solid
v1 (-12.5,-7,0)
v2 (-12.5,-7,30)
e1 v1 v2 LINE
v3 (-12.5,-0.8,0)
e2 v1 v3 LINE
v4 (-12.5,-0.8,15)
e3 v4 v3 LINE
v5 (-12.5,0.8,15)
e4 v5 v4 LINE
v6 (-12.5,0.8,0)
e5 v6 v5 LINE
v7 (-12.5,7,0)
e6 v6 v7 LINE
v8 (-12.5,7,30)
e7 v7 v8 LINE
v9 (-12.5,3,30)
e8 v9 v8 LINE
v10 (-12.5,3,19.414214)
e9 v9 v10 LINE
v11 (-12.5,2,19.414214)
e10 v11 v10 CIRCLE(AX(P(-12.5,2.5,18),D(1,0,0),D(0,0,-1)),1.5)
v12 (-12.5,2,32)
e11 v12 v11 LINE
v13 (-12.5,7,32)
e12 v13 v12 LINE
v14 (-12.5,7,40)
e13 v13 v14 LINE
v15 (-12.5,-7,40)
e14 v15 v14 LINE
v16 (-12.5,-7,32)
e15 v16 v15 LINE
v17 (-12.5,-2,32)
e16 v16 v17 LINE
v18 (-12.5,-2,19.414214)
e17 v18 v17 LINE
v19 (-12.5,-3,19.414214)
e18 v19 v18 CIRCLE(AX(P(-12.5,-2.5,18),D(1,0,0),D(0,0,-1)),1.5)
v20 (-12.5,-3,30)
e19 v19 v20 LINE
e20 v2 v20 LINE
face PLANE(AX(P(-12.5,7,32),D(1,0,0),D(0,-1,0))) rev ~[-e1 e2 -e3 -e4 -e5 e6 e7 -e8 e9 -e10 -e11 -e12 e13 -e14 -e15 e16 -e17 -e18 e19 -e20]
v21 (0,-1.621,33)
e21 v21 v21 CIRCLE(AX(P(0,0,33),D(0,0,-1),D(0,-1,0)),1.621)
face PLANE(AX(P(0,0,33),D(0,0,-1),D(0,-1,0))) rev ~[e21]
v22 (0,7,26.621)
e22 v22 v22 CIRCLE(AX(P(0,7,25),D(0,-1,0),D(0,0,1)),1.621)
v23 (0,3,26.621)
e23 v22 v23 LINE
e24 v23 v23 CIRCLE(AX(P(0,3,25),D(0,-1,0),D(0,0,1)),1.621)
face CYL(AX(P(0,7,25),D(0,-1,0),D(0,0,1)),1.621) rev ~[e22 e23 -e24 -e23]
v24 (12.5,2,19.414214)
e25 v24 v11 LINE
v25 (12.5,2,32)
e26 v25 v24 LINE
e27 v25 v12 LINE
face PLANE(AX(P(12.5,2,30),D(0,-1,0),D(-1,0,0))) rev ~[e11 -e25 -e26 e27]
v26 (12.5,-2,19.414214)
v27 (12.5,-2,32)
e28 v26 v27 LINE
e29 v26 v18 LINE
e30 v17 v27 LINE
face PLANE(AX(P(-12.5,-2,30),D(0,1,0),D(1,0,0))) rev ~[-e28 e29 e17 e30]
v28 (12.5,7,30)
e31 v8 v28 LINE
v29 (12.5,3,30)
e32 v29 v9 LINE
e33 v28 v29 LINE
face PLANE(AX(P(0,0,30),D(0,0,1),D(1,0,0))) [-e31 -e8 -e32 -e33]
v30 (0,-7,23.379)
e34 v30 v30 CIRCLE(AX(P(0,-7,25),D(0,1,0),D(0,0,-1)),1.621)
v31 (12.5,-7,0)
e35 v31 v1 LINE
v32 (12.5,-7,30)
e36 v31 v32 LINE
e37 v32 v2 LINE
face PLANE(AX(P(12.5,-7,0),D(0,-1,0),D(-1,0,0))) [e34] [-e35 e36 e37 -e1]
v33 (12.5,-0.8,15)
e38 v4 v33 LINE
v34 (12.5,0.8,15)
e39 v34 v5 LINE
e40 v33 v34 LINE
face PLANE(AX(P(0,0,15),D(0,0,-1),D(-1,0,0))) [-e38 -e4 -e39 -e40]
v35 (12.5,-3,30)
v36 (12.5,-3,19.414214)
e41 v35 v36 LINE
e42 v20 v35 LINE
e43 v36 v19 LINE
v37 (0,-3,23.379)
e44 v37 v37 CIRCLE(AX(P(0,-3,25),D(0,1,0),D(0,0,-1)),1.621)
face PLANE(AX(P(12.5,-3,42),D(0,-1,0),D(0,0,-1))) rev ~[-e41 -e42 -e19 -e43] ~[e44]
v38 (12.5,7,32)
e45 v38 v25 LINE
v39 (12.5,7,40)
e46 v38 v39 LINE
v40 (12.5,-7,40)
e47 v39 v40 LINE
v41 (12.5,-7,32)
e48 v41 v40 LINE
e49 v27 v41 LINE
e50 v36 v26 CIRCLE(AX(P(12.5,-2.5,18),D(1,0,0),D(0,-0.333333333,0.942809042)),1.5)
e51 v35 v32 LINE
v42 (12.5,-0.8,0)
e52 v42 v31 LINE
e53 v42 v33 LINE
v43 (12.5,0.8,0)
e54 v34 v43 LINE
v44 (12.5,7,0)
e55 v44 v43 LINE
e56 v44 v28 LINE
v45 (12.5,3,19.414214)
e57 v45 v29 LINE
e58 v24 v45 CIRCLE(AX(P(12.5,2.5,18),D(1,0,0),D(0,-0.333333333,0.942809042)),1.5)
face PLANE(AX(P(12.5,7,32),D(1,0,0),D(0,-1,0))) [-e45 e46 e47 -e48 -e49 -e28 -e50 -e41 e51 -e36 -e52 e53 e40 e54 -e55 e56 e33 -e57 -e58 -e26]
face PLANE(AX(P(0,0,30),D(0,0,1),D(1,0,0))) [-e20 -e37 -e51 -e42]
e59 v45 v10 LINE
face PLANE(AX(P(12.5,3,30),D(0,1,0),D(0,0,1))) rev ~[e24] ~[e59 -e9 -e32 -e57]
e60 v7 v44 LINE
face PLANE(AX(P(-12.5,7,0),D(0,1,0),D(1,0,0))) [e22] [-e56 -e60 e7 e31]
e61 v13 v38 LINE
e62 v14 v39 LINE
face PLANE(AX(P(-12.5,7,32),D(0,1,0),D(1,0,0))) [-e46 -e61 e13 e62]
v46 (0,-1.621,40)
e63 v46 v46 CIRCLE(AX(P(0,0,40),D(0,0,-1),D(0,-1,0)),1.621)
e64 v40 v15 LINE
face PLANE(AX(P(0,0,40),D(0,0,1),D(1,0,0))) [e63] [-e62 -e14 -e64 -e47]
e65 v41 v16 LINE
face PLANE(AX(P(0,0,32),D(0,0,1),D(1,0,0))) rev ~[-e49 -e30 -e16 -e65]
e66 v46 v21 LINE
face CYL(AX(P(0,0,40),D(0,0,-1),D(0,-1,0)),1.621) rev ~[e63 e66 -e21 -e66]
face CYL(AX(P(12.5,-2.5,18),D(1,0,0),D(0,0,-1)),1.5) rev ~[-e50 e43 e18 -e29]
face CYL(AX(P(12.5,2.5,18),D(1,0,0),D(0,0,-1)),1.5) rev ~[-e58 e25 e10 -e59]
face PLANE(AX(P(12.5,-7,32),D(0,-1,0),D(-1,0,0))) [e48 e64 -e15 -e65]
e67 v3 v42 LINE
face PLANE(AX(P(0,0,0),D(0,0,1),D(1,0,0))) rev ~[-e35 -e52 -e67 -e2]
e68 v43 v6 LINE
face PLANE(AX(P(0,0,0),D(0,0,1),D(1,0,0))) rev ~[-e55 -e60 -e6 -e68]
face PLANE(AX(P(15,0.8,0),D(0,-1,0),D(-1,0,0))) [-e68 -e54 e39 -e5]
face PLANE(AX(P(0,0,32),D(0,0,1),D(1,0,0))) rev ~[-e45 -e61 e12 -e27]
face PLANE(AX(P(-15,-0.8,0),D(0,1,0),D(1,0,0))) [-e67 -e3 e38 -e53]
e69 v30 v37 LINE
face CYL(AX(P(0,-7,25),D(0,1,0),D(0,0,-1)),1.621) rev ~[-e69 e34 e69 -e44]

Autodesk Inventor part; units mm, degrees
ref_plane "YZ Plane" through (0, 0, 0) normal (1, 0, 0) x (0, 1, 0)
ref_plane "XZ Plane" through (0, 0, 0) normal (0, 1, 0) x (-1, 0, 0)
ref_plane "XY Plane" through (0, 0, 0) normal (0, 0, 1) x (1, 0, 0)
sketch "Sketch1" plane through (0, 0, 0) normal (0, 0, 1) x (1, 0, 0)
  line L0 (12.5, -7) -> (-12.5, -7)
  line L1 (-12.5, -7) -> (-12.5, 7)
  line L2 (-12.5, 7) -> (12.5, 7)
  line L3 (12.5, 7) -> (12.5, -7)
  line L4 (12.5, -7) -> (-12.5, 7) construction
  line L5 (-12.5, -7) -> (12.5, 7) construction
  point P0 (0, 0)
  dimension "d0" = 25
  dimension "d1" = 14
extrude "Extrusion1" add sketch "Sketch1" along normal blind 30
sketch "Sketch2" plane through (0, 0, 0) normal (0, 0, -1) x (-1, 0, 0)
  line L0 (15, -0.8) -> (-15, -0.8)
  line L1 (-15, -0.8) -> (-15, 0.8)
  line L2 (-15, 0.8) -> (15, 0.8)
  line L3 (15, 0.8) -> (15, -0.8)
  line L4 (15, -0.8) -> (-15, 0.8) construction
  line L5 (-15, -0.8) -> (15, 0.8) construction
  point P0 (0, 0)
  dimension "d4" = 30
  dimension "d5" = 1.6
extrude "Extrusion2" cut sketch "Sketch2" against normal blind 15
sketch "Sketch4" plane through (12.5, -7, 30) normal (1, 0, 0) x (0, 0, -1)
  line L0 (-12, 4.5) -> (12, 4.5)
  line L1 (12, 4.5) -> (12, 9.5)
  line L2 (12, 9.5) -> (-12, 9.5)
  line L3 (-12, 9.5) -> (-12, 4.5)
  line L4 (0, 0) -> (0, 14) projected
  line L5 (-12, 4.5) -> (12, 9.5) construction
  line L6 (12, 4.5) -> (-12, 9.5) construction
  line L7 (30, 0) -> (0, 0) projected
  circle A0 centre (12, 9.5) radius 1.5
  circle A1 centre (12, 4.5) radius 1.5
  line L8 (-12, 9) -> (12, 9)
  line L9 (12, 9) -> (12, 10)
  line L10 (12, 10) -> (-12, 10)
  line L11 (-12, 10) -> (-12, 9)
  line L12 (0, 14) -> (0, 0) projected
  line L13 (-12, 9) -> (12, 10) construction
  line L14 (12, 9) -> (-12, 10) construction
  line L15 (-12, 4) -> (12, 4)
  line L16 (12, 4) -> (12, 5)
  line L17 (12, 5) -> (-12, 5)
  line L18 (-12, 5) -> (-12, 4)
  line L19 (-12, 4) -> (12, 5) construction
  line L20 (12, 4) -> (-12, 5) construction
  point P0 (30, 7)
  point P1 (0, 7)
  point P2 (0, 9.5)
  point P3 (0, 4.5)
  point P4 (10.5858, 5)
  point P5 (10.5858, 4)
  point P6 (10.5858, 10)
  point P7 (-12, 9)
  point P8 (10.5858, 9)
  dimension "d16" = 5
  dimension "d17" = 3
  dimension "d18" = 3
  dimension "d19" = 1
  dimension "d20" = 1
  dimension "d23" = 12
extrude "Extrusion3" cut sketch "Sketch4" against normal through all contours L3 L17 L4 L0 | L0 L4 L15 L18 | L4 L17 A1 L0 | L0 A1 L15 L4 | A1 L17 L1 L0 | L0 L16 L15 A1 | L3 L2 L4 L8 | L1 A1 L15 L16 | A1 L1 L17 | L4 L2 A0 L8 | L11 L10 L4 L2 | L4 L10 A0 L2 | L8 L1 A0 | A0 L2 L1 L8 | L1 L9 L10 A0 | A0 L10 L9 L2
sketch "Sketch5" plane through (-12.5, 7, 0) normal (0, 1, 0) x (1, 0, 0)
  line L0 (25, -30) -> (0, -30) projected
  point P0 (12.5, 0)
  point P1 (12.5, -25)
  point P2 (12.5, -30)
  dimension "d24" = 5
sketch "Sketch6" plane through (-12.5, -7, 0) normal (0, -1, 0) x (1, 0, 0)
  point P0 (12.5, 0)
  point P1 (12.5, 25)
hole "Hole2" at (0, -7, 25) direction (0, 1, 0) diameter 3.242 depth 4 thread size "M4x0.7" class "6H" standard "ISO Metric profile"
hole "Hole3" at (0, 7, 25) direction (0, -1, 0) diameter 3.242 depth 4 thread size "M4x0.7" class "6H" standard "ISO Metric profile"
sketch "Sketch7" plane through (0, 0, 30) normal (0, 0, 1) x (1, 0, 0)
  line L0 (-12.5, -2) -> (12.5, -2) projected
  line L1 (12.5, -2) -> (12.5, 2) projected
  line L2 (12.5, 2) -> (-12.5, 2) projected
  line L3 (-12.5, 2) -> (-12.5, -2) projected
  point P0 (0, 0)
extrude "Extrusion4" add sketch "Sketch7" along normal blind 2
sketch "Sketch11" plane through (0, 0, 32) normal (0, 0, 1) x (1, 0, 0)
  line L0 (-12.5, 7) -> (-12.5, 0.8) projected
  line L1 (12.5, -7) -> (-12.5, -7)
  line L2 (-12.5, -7) -> (-12.5, 7)
  line L3 (-12.5, 7) -> (12.5, 7)
  line L4 (12.5, 7) -> (12.5, -7)
  line L5 (12.5, -7) -> (-12.5, 7) construction
  line L6 (-12.5, -7) -> (12.5, 7) construction
  point P0 (0, 0)
  point P1 (-12.5, 0.8)
extrude "Extrusion6" add sketch "Sketch11" along normal blind 8
sketch "Sketch12" plane through (0, 0, 40) normal (0, 0, 1) x (1, 0, 0)
  point P0 (0, 0)
  point P1 (0, 0)
hole "Hole4" at (0, 0, 40) direction (0, 0, -1) diameter 3.242 depth 7 thread size "M4x0.7" class "6H" standard "ISO Metric profile"
properties part number "holder_slide_1.5mmThick_25mmWide"
